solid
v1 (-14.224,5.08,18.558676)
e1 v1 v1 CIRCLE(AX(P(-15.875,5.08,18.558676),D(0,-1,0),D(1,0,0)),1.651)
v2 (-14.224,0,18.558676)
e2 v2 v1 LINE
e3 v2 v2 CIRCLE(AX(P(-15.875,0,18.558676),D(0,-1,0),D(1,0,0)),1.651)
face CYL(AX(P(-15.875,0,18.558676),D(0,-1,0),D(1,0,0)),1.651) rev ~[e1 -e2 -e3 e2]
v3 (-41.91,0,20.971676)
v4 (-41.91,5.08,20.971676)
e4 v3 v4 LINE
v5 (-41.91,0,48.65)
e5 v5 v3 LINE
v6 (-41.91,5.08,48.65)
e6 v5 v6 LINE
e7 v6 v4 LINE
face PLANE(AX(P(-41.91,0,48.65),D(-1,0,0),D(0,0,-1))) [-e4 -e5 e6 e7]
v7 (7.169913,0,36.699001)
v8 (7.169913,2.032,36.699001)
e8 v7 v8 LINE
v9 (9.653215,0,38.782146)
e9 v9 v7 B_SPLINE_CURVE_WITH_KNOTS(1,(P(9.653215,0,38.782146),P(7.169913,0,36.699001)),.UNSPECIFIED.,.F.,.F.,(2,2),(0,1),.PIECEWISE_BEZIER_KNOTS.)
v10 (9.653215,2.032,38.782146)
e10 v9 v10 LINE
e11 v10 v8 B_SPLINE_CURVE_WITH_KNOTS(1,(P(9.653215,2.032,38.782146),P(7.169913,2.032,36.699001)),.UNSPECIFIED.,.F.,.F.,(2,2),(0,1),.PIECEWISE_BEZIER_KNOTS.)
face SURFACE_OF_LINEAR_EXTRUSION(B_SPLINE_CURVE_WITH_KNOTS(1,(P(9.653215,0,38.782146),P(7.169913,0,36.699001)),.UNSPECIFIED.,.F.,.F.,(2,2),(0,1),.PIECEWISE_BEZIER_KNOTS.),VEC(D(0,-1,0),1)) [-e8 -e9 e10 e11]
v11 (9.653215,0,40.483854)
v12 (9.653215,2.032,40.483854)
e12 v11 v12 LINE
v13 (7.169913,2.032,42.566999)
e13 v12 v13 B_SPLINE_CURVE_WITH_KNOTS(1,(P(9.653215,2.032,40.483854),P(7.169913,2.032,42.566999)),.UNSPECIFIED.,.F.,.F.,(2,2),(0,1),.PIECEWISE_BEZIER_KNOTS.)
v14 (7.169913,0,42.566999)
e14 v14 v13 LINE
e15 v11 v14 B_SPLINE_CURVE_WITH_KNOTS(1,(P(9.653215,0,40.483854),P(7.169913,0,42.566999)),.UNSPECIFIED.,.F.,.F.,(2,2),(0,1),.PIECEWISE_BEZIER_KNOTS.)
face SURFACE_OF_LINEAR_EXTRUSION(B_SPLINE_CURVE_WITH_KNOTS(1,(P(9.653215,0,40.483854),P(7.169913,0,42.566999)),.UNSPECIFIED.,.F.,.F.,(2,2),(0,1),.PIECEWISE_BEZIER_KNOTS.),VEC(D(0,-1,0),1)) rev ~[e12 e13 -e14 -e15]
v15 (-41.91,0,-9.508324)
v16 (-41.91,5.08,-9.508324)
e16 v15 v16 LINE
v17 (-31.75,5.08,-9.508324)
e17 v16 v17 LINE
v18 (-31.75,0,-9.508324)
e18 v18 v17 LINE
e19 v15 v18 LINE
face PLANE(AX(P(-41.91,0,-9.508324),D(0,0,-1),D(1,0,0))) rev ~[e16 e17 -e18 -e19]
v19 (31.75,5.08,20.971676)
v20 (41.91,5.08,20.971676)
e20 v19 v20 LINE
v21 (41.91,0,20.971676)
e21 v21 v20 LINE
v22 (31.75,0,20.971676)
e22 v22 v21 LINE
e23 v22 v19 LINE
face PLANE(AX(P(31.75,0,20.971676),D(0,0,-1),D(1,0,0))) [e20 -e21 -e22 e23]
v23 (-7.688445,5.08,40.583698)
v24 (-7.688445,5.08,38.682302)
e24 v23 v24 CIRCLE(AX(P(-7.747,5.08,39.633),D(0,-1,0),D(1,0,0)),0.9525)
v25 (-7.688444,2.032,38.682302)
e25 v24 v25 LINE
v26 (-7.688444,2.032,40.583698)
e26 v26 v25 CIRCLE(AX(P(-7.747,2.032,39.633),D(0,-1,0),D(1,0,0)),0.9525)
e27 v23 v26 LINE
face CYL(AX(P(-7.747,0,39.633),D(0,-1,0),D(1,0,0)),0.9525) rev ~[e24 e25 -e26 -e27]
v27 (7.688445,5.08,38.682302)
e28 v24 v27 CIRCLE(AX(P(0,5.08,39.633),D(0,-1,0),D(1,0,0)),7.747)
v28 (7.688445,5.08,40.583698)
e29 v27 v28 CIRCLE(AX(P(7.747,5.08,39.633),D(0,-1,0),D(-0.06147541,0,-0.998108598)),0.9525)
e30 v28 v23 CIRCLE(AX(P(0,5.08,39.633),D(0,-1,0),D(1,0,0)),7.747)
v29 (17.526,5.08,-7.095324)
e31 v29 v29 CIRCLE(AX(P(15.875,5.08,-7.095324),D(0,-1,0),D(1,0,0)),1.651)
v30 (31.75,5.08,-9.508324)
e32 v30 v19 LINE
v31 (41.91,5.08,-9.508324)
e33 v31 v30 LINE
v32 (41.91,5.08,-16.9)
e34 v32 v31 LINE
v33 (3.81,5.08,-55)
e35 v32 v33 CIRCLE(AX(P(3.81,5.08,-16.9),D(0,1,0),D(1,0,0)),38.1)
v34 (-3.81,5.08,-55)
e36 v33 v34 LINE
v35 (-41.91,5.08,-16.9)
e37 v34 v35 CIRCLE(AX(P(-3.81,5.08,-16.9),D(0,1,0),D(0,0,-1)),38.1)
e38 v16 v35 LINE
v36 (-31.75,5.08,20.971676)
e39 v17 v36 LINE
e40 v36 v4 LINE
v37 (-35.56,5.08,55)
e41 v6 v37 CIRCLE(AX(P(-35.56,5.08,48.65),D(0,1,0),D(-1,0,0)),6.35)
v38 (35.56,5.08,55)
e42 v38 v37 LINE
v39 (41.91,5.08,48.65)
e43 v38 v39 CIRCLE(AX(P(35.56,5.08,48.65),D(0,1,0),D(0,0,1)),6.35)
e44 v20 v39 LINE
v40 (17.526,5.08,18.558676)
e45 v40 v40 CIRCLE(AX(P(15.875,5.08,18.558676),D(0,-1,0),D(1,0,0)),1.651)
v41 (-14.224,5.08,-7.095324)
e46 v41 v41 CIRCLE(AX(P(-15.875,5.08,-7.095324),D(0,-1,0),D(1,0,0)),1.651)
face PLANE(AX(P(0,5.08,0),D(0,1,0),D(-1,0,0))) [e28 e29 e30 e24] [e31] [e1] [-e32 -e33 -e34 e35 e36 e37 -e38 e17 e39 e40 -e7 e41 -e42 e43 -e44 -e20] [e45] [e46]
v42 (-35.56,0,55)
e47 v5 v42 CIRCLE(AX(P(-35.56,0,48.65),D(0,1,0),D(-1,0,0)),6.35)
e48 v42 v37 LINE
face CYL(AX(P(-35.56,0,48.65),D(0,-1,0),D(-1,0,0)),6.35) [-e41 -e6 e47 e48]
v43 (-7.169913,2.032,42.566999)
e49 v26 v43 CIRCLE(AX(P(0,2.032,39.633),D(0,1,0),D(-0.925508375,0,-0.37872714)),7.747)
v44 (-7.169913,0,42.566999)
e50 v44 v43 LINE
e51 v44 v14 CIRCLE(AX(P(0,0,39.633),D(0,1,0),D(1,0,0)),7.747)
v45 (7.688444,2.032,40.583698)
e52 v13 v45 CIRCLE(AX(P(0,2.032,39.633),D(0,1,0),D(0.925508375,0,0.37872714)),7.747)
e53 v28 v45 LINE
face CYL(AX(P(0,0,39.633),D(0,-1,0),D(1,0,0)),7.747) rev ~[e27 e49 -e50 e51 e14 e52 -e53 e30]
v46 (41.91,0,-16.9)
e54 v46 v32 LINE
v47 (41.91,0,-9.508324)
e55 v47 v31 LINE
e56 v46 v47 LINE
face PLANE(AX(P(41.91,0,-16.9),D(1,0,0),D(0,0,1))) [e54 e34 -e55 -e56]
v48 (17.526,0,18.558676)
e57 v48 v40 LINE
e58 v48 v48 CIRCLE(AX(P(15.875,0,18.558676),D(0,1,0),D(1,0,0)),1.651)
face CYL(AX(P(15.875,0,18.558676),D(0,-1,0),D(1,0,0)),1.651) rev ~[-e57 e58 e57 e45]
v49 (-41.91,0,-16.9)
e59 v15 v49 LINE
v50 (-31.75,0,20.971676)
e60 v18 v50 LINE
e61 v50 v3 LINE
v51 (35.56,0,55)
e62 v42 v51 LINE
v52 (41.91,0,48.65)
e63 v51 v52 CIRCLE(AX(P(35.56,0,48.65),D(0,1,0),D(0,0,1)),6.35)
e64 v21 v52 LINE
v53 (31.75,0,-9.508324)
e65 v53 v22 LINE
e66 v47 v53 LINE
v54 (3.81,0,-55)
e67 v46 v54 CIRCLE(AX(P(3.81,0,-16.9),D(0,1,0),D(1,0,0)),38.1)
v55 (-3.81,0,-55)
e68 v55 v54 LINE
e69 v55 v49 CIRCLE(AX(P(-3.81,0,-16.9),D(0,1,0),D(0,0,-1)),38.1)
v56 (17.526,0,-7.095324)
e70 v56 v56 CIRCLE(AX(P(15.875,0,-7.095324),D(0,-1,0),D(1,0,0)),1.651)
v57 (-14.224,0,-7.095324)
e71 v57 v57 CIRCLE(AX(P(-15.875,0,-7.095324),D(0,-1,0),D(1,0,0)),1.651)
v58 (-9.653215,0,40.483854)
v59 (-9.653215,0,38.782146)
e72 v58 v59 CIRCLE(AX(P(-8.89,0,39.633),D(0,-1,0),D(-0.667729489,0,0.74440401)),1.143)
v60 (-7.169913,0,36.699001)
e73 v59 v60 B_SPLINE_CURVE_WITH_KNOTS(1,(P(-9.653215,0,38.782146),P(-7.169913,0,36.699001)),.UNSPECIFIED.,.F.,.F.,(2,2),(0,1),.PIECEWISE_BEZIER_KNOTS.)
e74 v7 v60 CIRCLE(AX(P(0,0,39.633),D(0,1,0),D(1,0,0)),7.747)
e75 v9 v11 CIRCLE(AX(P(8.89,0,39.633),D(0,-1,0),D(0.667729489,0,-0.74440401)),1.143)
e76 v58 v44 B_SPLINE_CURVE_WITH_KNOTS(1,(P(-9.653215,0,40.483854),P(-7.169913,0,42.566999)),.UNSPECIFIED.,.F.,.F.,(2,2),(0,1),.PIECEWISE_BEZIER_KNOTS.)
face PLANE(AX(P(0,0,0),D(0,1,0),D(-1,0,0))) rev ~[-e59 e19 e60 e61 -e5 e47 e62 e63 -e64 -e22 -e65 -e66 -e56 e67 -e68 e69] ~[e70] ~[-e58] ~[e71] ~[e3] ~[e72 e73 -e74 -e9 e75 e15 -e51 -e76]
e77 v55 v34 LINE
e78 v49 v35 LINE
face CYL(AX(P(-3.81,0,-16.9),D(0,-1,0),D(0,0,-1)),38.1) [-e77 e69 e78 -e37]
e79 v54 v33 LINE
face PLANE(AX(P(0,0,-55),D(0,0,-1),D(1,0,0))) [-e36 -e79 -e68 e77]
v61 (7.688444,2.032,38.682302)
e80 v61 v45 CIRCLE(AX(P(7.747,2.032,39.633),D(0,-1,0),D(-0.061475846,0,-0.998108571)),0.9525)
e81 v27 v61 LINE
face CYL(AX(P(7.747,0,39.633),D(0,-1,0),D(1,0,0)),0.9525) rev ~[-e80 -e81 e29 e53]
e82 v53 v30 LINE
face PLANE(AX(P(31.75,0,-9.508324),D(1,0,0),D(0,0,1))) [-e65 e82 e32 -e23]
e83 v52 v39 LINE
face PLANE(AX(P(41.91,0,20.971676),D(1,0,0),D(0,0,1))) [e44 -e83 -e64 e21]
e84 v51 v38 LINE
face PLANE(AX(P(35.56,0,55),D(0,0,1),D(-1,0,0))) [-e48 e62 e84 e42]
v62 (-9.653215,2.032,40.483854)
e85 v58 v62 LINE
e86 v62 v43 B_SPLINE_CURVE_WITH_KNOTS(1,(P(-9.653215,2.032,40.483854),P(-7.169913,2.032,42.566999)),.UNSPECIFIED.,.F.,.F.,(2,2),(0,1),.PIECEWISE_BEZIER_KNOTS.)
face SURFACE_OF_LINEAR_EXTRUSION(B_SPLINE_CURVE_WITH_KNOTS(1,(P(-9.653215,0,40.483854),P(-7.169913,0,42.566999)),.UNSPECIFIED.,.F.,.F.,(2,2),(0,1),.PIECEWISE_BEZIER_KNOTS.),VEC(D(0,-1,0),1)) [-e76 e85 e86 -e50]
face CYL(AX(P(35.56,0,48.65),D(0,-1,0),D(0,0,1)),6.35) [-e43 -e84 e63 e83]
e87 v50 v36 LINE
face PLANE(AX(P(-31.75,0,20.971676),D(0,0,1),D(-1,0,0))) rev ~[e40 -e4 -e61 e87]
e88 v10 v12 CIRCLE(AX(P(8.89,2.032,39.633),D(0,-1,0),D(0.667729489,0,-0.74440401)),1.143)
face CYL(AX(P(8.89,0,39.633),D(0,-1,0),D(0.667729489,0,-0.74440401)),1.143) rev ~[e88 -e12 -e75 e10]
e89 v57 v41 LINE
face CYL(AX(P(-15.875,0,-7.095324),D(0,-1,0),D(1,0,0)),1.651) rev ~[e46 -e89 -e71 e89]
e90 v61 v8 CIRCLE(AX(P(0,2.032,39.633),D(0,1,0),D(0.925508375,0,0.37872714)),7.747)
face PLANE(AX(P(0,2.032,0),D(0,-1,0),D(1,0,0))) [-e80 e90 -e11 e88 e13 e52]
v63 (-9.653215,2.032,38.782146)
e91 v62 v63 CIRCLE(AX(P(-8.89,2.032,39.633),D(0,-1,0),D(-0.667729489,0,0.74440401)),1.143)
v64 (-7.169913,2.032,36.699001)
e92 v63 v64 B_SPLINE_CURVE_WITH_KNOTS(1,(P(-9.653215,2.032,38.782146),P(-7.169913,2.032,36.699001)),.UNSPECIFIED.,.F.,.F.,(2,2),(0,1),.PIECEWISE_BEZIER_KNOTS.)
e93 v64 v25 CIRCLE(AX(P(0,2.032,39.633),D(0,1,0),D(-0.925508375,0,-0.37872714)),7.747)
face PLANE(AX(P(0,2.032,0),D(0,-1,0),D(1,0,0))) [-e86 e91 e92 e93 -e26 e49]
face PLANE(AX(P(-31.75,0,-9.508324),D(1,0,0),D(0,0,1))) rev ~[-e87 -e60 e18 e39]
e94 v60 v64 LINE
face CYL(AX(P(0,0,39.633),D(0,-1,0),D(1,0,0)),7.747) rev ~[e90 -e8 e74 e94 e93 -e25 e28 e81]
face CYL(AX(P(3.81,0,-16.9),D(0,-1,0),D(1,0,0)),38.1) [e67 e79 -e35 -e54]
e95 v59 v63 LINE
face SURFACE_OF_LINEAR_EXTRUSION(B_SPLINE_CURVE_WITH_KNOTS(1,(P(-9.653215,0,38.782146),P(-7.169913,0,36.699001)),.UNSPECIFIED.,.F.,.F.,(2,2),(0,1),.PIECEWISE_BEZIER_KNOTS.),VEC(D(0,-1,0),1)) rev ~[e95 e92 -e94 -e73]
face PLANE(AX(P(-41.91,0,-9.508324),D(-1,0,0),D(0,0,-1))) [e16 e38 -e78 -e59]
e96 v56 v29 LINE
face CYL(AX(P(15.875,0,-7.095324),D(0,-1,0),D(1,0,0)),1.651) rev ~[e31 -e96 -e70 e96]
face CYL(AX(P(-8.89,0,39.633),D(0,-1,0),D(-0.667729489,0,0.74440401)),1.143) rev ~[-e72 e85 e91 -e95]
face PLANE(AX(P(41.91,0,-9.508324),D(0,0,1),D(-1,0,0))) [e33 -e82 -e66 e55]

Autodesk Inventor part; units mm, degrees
ref_plane "YZ Plane" through (0, 0, 0) normal (1, 0, 0) x (0, 1, 0)
ref_plane "XZ Plane" through (0, 0, 0) normal (0, 1, 0) x (-1, 0, 0)
ref_plane "XY Plane" through (0, 0, 0) normal (0, 0, 1) x (1, 0, 0)
sketch "Sketch1" plane through (0, 0, 0) normal (0, 1, 0) x (-1, 0, 0)
  line L0 (-35.56, 55) -> (35.56, 55)
  line L1 (41.91, 48.65) -> (41.91, -16.9)
  line L2 (3.81, -55) -> (-3.81, -55)
  line L3 (-41.91, -16.9) -> (-41.91, 48.65)
  line L4 (-41.91, 55) -> (41.91, -55) construction
  line L5 (41.91, 55) -> (-41.91, -55) construction
  arc A0 (3.81, -55) -> (41.91, -16.9) centre (3.81, -16.9) ccw
  arc A1 (-41.91, -16.9) -> (-3.81, -55) centre (-3.81, -16.9) ccw
  arc A2 (41.91, 48.65) -> (35.56, 55) centre (35.56, 48.65) ccw
  arc A3 (-35.56, 55) -> (-41.91, 48.65) centre (-35.56, 48.65) ccw
  line L6 (113.65, -53.500747) -> (-33.65, 85.250747) construction
  line L7 (-33.65, -53.500747) -> (113.65, 85.250747) construction
  line L8 (52.07, -9.508324) -> (31.75, -9.508324)
  line L9 (31.75, -9.508324) -> (31.75, 20.971676)
  line L10 (31.75, 20.971676) -> (52.07, 20.971676)
  line L11 (52.07, 20.971676) -> (52.07, -9.508324)
  line L12 (52.07, -9.508324) -> (31.75, 20.971676) construction
  line L13 (31.75, -9.508324) -> (52.07, 20.971676) construction
  line L14 (0, -55) -> (0, 55)
  line L15 (33.65, -53.500747) -> (-113.65, 85.250747) construction
  line L16 (-52.07, -9.508324) -> (-31.75, -9.508324)
  line L17 (-31.75, -9.508324) -> (-31.75, 20.971676)
  line L18 (-31.75, 20.971676) -> (-52.07, 20.971676)
  line L19 (-52.07, 20.971676) -> (-52.07, -9.508324)
  line L20 (-52.07, -9.508324) -> (-31.75, 20.971676) construction
  line L21 (-31.75, -9.508324) -> (-52.07, 20.971676) construction
  line L22 (-52.07, 20.971676) -> (-31.75, 20.971676)
  line L23 (-31.75, 20.971676) -> (-31.75, -9.508324)
  line L24 (-31.75, -9.508324) -> (-52.07, -9.508324)
  line L25 (-52.07, -9.508324) -> (-52.07, 20.971676)
  line L26 (-52.07, 20.971676) -> (-31.75, -9.508324) construction
  line L27 (-31.75, 20.971676) -> (-52.07, -9.508324) construction
  point P0 (0, 0)
  point P1 (-35.56, 48.65)
  point P2 (41.91, 5.731676)
  point P3 (-41.91, 5.731676)
  point P4 (-41.91, 5.731676)
  point P5 (41.91, -9.508324)
  point P6 (41.91, 20.971676)
  point P7 (-41.91, 20.971676)
  point P8 (-41.91, -9.508324)
  dimension "d0" = 83.82
  dimension "d1" = 110
  dimension "d2" = 38.1
  dimension "d3" = 38.1
  dimension "d4" = 6.35
  dimension "d5" = 6.35
  dimension "d11" = 20.32
  dimension "d12" = 30.48
extrude "Extrusion1" add sketch "Sketch1" along normal blind 5.08 contours L0 L14 L2 A1 L3 L16 L17 L18 A3 | L0 A2 L1 L10 L9 L8 A0 L2 L14
sketch "Sketch2" plane through (0, 0, 0) normal (0, -1, 0) x (1, 0, 0)
  line L0 (-35.56, 55) -> (35.56, 55)
  line L1 (0, 55) -> (0, 47.38)
  line L2 (0, 47.38) -> (0, 31.886)
  circle A0 centre (0, 39.633) radius 7.747
  line L3 (7.747, 39.633) -> (9.017, 39.633)
  circle A1 centre (9.017, 39.633) radius 1.27
  line L4 (9.756904, 38.600798) -> (7.196844, 36.765693) construction
  spline S0 degree 1 poles (9.756904, 38.600798) (7.196844, 36.765693) knots 1 1 2 2
  line L5 (9.770215, 40.65553) -> (7.167589, 42.572673) construction
  spline S1 degree 1 poles (9.770215, 40.65553) (7.167589, 42.572673) knots 1 1 2 2
  line L6 (-7.747, 39.633) -> (-9.017, 39.633)
  circle A2 centre (-9.017, 39.633) radius 1.27
  line L7 (-9.756904, 38.600798) -> (-7.196844, 36.765693) construction
  spline S2 degree 1 poles (-9.756904, 38.600798) (-7.196844, 36.765693) knots 1 1 2 2
  line L8 (-9.770215, 40.65553) -> (-7.167589, 42.572673) construction
  spline S3 degree 1 poles (-9.770215, 40.65553) (-7.167589, 42.572673) knots 1 1 2 2
  circle A3 centre (-9.017, 39.633) radius 1.27
  line L9 (-9.770215, 40.65553) -> (-7.167589, 42.572673) construction
  spline S4 degree 1 poles (-9.770215, 40.65553) (-7.167589, 42.572673) knots 1 1 2 2
  line L10 (-9.756904, 38.600798) -> (-7.196844, 36.765693) construction
  spline S5 degree 1 poles (-9.756904, 38.600798) (-7.196844, 36.765693) knots 1 1 2 2
  line L11 (10.287, 39.633) -> (10.287, 32.454774)
  line L12 (-10.287, 39.633) -> (-10.287, 31.176127)
  circle A4 centre (7.747, 39.633) radius 1.016
  line L13 (-7.747, 39.633) -> (-9.017, 39.633)
  circle A5 centre (-9.017, 39.633) radius 1.27
  circle A6 centre (-7.747, 39.633) radius 1.016
  circle A7 centre (-7.747, 39.633) radius 1.016
  point P0 (0, 0)
  dimension "d16" = 7.62
  dimension "d17" = 15.494
  dimension "d19" = 1.27
  dimension "d27" = 2.032
  dimension "d28" = 20.574
extrude "Extrusion2" cut sketch "Sketch2" against normal blind 5.08 contours A0 A4 L2 | L2 A0 A6 | A0 A4 | A6 A0
sketch "Sketch7" plane through (0, 0, 0) normal (0, -1, 0) x (1, 0, 0)
  circle A0 centre (0, 39.633) radius 7.747
  line L0 (7.747, 39.633) -> (8.89, 39.633)
  circle A1 centre (8.89, 39.633) radius 1.143
  circle A2 centre (7.747, 39.633) radius 0.9525
  line L1 (9.653215, 40.483854) -> (7.169913, 42.566999) construction
  spline S0 degree 1 poles (9.653215, 40.483854) (7.169913, 42.566999) knots 1 1 2 2
  line L2 (9.653215, 38.782146) -> (7.169913, 36.699001) construction
  spline S1 degree 1 poles (9.653215, 38.782146) (7.169913, 36.699001) knots 1 1 2 2
  line L3 (0, 47.38) -> (0, 31.886)
  circle A3 centre (-8.89, 39.633) radius 1.143
  line L4 (-9.653215, 40.483854) -> (-7.169913, 42.566999) construction
  spline S2 degree 1 poles (-9.653215, 40.483854) (-7.169913, 42.566999) knots 1 1 2 2
  line L5 (-9.653215, 38.782146) -> (-7.169913, 36.699001) construction
  spline S3 degree 1 poles (-9.653215, 38.782146) (-7.169913, 36.699001) knots 1 1 2 2
  circle A4 centre (-8.89, 39.633) radius 1.143
  line L6 (-9.653215, 40.483854) -> (-7.169913, 42.566999) construction
  spline S4 degree 1 poles (-9.653215, 40.483854) (-7.169913, 42.566999) knots 1 1 2 2
  line L7 (-9.653215, 38.782146) -> (-7.169913, 36.699001) construction
  spline S5 degree 1 poles (-9.653215, 38.782146) (-7.169913, 36.699001) knots 1 1 2 2
  point P0 (0, 0)
  dimension "d40" = 1.143
  dimension "d41" = 1.905
sketch "Sketch7 outline for Extrusion4" plane through (0, 0, 0) normal (0, -1, 0) x (1, 0, 0)
  spline S0 degree 1 poles (-9.653215, 40.483854) (-7.169913, 42.566999) knots 0 0 1 1
  arc A0 (-7.169913, 36.699001) -> (-7.169913, 42.566999) centre (0, 39.633) cw
  spline S1 degree 1 poles (-9.653215, 38.782146) (-7.169913, 36.699001) knots 0 0 1 1
  arc A1 (-9.653215, 40.483854) -> (-9.653215, 38.782146) centre (-8.89, 39.633) ccw
  spline S2 degree 1 poles (9.653215, 40.483854) (7.169913, 42.566999) knots 0 0 1 1
  arc A2 (9.653215, 38.782146) -> (9.653215, 40.483854) centre (8.89, 39.633) ccw
  spline S3 degree 1 poles (9.653215, 38.782146) (7.169913, 36.699001) knots 0 0 1 1
  arc A3 (7.169913, 42.566999) -> (7.169913, 36.699001) centre (0, 39.633) cw
extrude "Extrusion4" cut sketch "Sketch7 outline for Extrusion4" against normal blind 2.032
sketch "Sketch8" plane through (0, 0, 0) normal (0, -1, 0) x (1, 0, 0)
  arc A0 (7.169913, 36.699001) -> (7.169913, 42.566999) centre (0, 39.633) ccw
  circle A1 centre (7.747, 39.633) radius 0.9525
  line L0 (0, 47.38) -> (0, 31.886)
  circle A2 centre (-7.747, 39.633) radius 0.9525
  circle A3 centre (-7.747, 39.633) radius 0.9525
  point P0 (0, 0)
  dimension "d44" = 1.905
extrude "Extrusion5" cut sketch "Sketch8" against normal blind 5.08
sketch "Sketch9" plane through (0, 0, 0) normal (0, -1, 0) x (1, 0, 0)
  line L0 (31.75, 20.971676) -> (31.75, -9.508324)
  line L1 (31.75, 5.731676) -> (10.338001, 5.731676)
  line L2 (0, 23.8125) -> (0, -11.1125)
  line L3 (15.875, 5.731676) -> (15.875, 18.558676)
  line L4 (41.91, 18.558676) -> (15.875, 18.558676)
  line L5 (41.91, 48.65) -> (41.91, 20.971676)
  circle A0 centre (15.875, 18.558676) radius 1.651
  circle A1 centre (15.875, -7.095324) radius 1.651
  circle A2 centre (-15.875, 18.558676) radius 1.651
  circle A3 centre (-15.875, -7.095324) radius 1.651
  point P0 (0, 0)
  dimension "d51" = 12.827
  dimension "d52" = 26.035
  dimension "d53" = 3.302
extrude "Extrusion6" cut sketch "Sketch9" against normal blind 5.08 contours A0 L3 L4 | L4 L3 A0 | A1 | A2 | A3
properties part number "micromouse"
